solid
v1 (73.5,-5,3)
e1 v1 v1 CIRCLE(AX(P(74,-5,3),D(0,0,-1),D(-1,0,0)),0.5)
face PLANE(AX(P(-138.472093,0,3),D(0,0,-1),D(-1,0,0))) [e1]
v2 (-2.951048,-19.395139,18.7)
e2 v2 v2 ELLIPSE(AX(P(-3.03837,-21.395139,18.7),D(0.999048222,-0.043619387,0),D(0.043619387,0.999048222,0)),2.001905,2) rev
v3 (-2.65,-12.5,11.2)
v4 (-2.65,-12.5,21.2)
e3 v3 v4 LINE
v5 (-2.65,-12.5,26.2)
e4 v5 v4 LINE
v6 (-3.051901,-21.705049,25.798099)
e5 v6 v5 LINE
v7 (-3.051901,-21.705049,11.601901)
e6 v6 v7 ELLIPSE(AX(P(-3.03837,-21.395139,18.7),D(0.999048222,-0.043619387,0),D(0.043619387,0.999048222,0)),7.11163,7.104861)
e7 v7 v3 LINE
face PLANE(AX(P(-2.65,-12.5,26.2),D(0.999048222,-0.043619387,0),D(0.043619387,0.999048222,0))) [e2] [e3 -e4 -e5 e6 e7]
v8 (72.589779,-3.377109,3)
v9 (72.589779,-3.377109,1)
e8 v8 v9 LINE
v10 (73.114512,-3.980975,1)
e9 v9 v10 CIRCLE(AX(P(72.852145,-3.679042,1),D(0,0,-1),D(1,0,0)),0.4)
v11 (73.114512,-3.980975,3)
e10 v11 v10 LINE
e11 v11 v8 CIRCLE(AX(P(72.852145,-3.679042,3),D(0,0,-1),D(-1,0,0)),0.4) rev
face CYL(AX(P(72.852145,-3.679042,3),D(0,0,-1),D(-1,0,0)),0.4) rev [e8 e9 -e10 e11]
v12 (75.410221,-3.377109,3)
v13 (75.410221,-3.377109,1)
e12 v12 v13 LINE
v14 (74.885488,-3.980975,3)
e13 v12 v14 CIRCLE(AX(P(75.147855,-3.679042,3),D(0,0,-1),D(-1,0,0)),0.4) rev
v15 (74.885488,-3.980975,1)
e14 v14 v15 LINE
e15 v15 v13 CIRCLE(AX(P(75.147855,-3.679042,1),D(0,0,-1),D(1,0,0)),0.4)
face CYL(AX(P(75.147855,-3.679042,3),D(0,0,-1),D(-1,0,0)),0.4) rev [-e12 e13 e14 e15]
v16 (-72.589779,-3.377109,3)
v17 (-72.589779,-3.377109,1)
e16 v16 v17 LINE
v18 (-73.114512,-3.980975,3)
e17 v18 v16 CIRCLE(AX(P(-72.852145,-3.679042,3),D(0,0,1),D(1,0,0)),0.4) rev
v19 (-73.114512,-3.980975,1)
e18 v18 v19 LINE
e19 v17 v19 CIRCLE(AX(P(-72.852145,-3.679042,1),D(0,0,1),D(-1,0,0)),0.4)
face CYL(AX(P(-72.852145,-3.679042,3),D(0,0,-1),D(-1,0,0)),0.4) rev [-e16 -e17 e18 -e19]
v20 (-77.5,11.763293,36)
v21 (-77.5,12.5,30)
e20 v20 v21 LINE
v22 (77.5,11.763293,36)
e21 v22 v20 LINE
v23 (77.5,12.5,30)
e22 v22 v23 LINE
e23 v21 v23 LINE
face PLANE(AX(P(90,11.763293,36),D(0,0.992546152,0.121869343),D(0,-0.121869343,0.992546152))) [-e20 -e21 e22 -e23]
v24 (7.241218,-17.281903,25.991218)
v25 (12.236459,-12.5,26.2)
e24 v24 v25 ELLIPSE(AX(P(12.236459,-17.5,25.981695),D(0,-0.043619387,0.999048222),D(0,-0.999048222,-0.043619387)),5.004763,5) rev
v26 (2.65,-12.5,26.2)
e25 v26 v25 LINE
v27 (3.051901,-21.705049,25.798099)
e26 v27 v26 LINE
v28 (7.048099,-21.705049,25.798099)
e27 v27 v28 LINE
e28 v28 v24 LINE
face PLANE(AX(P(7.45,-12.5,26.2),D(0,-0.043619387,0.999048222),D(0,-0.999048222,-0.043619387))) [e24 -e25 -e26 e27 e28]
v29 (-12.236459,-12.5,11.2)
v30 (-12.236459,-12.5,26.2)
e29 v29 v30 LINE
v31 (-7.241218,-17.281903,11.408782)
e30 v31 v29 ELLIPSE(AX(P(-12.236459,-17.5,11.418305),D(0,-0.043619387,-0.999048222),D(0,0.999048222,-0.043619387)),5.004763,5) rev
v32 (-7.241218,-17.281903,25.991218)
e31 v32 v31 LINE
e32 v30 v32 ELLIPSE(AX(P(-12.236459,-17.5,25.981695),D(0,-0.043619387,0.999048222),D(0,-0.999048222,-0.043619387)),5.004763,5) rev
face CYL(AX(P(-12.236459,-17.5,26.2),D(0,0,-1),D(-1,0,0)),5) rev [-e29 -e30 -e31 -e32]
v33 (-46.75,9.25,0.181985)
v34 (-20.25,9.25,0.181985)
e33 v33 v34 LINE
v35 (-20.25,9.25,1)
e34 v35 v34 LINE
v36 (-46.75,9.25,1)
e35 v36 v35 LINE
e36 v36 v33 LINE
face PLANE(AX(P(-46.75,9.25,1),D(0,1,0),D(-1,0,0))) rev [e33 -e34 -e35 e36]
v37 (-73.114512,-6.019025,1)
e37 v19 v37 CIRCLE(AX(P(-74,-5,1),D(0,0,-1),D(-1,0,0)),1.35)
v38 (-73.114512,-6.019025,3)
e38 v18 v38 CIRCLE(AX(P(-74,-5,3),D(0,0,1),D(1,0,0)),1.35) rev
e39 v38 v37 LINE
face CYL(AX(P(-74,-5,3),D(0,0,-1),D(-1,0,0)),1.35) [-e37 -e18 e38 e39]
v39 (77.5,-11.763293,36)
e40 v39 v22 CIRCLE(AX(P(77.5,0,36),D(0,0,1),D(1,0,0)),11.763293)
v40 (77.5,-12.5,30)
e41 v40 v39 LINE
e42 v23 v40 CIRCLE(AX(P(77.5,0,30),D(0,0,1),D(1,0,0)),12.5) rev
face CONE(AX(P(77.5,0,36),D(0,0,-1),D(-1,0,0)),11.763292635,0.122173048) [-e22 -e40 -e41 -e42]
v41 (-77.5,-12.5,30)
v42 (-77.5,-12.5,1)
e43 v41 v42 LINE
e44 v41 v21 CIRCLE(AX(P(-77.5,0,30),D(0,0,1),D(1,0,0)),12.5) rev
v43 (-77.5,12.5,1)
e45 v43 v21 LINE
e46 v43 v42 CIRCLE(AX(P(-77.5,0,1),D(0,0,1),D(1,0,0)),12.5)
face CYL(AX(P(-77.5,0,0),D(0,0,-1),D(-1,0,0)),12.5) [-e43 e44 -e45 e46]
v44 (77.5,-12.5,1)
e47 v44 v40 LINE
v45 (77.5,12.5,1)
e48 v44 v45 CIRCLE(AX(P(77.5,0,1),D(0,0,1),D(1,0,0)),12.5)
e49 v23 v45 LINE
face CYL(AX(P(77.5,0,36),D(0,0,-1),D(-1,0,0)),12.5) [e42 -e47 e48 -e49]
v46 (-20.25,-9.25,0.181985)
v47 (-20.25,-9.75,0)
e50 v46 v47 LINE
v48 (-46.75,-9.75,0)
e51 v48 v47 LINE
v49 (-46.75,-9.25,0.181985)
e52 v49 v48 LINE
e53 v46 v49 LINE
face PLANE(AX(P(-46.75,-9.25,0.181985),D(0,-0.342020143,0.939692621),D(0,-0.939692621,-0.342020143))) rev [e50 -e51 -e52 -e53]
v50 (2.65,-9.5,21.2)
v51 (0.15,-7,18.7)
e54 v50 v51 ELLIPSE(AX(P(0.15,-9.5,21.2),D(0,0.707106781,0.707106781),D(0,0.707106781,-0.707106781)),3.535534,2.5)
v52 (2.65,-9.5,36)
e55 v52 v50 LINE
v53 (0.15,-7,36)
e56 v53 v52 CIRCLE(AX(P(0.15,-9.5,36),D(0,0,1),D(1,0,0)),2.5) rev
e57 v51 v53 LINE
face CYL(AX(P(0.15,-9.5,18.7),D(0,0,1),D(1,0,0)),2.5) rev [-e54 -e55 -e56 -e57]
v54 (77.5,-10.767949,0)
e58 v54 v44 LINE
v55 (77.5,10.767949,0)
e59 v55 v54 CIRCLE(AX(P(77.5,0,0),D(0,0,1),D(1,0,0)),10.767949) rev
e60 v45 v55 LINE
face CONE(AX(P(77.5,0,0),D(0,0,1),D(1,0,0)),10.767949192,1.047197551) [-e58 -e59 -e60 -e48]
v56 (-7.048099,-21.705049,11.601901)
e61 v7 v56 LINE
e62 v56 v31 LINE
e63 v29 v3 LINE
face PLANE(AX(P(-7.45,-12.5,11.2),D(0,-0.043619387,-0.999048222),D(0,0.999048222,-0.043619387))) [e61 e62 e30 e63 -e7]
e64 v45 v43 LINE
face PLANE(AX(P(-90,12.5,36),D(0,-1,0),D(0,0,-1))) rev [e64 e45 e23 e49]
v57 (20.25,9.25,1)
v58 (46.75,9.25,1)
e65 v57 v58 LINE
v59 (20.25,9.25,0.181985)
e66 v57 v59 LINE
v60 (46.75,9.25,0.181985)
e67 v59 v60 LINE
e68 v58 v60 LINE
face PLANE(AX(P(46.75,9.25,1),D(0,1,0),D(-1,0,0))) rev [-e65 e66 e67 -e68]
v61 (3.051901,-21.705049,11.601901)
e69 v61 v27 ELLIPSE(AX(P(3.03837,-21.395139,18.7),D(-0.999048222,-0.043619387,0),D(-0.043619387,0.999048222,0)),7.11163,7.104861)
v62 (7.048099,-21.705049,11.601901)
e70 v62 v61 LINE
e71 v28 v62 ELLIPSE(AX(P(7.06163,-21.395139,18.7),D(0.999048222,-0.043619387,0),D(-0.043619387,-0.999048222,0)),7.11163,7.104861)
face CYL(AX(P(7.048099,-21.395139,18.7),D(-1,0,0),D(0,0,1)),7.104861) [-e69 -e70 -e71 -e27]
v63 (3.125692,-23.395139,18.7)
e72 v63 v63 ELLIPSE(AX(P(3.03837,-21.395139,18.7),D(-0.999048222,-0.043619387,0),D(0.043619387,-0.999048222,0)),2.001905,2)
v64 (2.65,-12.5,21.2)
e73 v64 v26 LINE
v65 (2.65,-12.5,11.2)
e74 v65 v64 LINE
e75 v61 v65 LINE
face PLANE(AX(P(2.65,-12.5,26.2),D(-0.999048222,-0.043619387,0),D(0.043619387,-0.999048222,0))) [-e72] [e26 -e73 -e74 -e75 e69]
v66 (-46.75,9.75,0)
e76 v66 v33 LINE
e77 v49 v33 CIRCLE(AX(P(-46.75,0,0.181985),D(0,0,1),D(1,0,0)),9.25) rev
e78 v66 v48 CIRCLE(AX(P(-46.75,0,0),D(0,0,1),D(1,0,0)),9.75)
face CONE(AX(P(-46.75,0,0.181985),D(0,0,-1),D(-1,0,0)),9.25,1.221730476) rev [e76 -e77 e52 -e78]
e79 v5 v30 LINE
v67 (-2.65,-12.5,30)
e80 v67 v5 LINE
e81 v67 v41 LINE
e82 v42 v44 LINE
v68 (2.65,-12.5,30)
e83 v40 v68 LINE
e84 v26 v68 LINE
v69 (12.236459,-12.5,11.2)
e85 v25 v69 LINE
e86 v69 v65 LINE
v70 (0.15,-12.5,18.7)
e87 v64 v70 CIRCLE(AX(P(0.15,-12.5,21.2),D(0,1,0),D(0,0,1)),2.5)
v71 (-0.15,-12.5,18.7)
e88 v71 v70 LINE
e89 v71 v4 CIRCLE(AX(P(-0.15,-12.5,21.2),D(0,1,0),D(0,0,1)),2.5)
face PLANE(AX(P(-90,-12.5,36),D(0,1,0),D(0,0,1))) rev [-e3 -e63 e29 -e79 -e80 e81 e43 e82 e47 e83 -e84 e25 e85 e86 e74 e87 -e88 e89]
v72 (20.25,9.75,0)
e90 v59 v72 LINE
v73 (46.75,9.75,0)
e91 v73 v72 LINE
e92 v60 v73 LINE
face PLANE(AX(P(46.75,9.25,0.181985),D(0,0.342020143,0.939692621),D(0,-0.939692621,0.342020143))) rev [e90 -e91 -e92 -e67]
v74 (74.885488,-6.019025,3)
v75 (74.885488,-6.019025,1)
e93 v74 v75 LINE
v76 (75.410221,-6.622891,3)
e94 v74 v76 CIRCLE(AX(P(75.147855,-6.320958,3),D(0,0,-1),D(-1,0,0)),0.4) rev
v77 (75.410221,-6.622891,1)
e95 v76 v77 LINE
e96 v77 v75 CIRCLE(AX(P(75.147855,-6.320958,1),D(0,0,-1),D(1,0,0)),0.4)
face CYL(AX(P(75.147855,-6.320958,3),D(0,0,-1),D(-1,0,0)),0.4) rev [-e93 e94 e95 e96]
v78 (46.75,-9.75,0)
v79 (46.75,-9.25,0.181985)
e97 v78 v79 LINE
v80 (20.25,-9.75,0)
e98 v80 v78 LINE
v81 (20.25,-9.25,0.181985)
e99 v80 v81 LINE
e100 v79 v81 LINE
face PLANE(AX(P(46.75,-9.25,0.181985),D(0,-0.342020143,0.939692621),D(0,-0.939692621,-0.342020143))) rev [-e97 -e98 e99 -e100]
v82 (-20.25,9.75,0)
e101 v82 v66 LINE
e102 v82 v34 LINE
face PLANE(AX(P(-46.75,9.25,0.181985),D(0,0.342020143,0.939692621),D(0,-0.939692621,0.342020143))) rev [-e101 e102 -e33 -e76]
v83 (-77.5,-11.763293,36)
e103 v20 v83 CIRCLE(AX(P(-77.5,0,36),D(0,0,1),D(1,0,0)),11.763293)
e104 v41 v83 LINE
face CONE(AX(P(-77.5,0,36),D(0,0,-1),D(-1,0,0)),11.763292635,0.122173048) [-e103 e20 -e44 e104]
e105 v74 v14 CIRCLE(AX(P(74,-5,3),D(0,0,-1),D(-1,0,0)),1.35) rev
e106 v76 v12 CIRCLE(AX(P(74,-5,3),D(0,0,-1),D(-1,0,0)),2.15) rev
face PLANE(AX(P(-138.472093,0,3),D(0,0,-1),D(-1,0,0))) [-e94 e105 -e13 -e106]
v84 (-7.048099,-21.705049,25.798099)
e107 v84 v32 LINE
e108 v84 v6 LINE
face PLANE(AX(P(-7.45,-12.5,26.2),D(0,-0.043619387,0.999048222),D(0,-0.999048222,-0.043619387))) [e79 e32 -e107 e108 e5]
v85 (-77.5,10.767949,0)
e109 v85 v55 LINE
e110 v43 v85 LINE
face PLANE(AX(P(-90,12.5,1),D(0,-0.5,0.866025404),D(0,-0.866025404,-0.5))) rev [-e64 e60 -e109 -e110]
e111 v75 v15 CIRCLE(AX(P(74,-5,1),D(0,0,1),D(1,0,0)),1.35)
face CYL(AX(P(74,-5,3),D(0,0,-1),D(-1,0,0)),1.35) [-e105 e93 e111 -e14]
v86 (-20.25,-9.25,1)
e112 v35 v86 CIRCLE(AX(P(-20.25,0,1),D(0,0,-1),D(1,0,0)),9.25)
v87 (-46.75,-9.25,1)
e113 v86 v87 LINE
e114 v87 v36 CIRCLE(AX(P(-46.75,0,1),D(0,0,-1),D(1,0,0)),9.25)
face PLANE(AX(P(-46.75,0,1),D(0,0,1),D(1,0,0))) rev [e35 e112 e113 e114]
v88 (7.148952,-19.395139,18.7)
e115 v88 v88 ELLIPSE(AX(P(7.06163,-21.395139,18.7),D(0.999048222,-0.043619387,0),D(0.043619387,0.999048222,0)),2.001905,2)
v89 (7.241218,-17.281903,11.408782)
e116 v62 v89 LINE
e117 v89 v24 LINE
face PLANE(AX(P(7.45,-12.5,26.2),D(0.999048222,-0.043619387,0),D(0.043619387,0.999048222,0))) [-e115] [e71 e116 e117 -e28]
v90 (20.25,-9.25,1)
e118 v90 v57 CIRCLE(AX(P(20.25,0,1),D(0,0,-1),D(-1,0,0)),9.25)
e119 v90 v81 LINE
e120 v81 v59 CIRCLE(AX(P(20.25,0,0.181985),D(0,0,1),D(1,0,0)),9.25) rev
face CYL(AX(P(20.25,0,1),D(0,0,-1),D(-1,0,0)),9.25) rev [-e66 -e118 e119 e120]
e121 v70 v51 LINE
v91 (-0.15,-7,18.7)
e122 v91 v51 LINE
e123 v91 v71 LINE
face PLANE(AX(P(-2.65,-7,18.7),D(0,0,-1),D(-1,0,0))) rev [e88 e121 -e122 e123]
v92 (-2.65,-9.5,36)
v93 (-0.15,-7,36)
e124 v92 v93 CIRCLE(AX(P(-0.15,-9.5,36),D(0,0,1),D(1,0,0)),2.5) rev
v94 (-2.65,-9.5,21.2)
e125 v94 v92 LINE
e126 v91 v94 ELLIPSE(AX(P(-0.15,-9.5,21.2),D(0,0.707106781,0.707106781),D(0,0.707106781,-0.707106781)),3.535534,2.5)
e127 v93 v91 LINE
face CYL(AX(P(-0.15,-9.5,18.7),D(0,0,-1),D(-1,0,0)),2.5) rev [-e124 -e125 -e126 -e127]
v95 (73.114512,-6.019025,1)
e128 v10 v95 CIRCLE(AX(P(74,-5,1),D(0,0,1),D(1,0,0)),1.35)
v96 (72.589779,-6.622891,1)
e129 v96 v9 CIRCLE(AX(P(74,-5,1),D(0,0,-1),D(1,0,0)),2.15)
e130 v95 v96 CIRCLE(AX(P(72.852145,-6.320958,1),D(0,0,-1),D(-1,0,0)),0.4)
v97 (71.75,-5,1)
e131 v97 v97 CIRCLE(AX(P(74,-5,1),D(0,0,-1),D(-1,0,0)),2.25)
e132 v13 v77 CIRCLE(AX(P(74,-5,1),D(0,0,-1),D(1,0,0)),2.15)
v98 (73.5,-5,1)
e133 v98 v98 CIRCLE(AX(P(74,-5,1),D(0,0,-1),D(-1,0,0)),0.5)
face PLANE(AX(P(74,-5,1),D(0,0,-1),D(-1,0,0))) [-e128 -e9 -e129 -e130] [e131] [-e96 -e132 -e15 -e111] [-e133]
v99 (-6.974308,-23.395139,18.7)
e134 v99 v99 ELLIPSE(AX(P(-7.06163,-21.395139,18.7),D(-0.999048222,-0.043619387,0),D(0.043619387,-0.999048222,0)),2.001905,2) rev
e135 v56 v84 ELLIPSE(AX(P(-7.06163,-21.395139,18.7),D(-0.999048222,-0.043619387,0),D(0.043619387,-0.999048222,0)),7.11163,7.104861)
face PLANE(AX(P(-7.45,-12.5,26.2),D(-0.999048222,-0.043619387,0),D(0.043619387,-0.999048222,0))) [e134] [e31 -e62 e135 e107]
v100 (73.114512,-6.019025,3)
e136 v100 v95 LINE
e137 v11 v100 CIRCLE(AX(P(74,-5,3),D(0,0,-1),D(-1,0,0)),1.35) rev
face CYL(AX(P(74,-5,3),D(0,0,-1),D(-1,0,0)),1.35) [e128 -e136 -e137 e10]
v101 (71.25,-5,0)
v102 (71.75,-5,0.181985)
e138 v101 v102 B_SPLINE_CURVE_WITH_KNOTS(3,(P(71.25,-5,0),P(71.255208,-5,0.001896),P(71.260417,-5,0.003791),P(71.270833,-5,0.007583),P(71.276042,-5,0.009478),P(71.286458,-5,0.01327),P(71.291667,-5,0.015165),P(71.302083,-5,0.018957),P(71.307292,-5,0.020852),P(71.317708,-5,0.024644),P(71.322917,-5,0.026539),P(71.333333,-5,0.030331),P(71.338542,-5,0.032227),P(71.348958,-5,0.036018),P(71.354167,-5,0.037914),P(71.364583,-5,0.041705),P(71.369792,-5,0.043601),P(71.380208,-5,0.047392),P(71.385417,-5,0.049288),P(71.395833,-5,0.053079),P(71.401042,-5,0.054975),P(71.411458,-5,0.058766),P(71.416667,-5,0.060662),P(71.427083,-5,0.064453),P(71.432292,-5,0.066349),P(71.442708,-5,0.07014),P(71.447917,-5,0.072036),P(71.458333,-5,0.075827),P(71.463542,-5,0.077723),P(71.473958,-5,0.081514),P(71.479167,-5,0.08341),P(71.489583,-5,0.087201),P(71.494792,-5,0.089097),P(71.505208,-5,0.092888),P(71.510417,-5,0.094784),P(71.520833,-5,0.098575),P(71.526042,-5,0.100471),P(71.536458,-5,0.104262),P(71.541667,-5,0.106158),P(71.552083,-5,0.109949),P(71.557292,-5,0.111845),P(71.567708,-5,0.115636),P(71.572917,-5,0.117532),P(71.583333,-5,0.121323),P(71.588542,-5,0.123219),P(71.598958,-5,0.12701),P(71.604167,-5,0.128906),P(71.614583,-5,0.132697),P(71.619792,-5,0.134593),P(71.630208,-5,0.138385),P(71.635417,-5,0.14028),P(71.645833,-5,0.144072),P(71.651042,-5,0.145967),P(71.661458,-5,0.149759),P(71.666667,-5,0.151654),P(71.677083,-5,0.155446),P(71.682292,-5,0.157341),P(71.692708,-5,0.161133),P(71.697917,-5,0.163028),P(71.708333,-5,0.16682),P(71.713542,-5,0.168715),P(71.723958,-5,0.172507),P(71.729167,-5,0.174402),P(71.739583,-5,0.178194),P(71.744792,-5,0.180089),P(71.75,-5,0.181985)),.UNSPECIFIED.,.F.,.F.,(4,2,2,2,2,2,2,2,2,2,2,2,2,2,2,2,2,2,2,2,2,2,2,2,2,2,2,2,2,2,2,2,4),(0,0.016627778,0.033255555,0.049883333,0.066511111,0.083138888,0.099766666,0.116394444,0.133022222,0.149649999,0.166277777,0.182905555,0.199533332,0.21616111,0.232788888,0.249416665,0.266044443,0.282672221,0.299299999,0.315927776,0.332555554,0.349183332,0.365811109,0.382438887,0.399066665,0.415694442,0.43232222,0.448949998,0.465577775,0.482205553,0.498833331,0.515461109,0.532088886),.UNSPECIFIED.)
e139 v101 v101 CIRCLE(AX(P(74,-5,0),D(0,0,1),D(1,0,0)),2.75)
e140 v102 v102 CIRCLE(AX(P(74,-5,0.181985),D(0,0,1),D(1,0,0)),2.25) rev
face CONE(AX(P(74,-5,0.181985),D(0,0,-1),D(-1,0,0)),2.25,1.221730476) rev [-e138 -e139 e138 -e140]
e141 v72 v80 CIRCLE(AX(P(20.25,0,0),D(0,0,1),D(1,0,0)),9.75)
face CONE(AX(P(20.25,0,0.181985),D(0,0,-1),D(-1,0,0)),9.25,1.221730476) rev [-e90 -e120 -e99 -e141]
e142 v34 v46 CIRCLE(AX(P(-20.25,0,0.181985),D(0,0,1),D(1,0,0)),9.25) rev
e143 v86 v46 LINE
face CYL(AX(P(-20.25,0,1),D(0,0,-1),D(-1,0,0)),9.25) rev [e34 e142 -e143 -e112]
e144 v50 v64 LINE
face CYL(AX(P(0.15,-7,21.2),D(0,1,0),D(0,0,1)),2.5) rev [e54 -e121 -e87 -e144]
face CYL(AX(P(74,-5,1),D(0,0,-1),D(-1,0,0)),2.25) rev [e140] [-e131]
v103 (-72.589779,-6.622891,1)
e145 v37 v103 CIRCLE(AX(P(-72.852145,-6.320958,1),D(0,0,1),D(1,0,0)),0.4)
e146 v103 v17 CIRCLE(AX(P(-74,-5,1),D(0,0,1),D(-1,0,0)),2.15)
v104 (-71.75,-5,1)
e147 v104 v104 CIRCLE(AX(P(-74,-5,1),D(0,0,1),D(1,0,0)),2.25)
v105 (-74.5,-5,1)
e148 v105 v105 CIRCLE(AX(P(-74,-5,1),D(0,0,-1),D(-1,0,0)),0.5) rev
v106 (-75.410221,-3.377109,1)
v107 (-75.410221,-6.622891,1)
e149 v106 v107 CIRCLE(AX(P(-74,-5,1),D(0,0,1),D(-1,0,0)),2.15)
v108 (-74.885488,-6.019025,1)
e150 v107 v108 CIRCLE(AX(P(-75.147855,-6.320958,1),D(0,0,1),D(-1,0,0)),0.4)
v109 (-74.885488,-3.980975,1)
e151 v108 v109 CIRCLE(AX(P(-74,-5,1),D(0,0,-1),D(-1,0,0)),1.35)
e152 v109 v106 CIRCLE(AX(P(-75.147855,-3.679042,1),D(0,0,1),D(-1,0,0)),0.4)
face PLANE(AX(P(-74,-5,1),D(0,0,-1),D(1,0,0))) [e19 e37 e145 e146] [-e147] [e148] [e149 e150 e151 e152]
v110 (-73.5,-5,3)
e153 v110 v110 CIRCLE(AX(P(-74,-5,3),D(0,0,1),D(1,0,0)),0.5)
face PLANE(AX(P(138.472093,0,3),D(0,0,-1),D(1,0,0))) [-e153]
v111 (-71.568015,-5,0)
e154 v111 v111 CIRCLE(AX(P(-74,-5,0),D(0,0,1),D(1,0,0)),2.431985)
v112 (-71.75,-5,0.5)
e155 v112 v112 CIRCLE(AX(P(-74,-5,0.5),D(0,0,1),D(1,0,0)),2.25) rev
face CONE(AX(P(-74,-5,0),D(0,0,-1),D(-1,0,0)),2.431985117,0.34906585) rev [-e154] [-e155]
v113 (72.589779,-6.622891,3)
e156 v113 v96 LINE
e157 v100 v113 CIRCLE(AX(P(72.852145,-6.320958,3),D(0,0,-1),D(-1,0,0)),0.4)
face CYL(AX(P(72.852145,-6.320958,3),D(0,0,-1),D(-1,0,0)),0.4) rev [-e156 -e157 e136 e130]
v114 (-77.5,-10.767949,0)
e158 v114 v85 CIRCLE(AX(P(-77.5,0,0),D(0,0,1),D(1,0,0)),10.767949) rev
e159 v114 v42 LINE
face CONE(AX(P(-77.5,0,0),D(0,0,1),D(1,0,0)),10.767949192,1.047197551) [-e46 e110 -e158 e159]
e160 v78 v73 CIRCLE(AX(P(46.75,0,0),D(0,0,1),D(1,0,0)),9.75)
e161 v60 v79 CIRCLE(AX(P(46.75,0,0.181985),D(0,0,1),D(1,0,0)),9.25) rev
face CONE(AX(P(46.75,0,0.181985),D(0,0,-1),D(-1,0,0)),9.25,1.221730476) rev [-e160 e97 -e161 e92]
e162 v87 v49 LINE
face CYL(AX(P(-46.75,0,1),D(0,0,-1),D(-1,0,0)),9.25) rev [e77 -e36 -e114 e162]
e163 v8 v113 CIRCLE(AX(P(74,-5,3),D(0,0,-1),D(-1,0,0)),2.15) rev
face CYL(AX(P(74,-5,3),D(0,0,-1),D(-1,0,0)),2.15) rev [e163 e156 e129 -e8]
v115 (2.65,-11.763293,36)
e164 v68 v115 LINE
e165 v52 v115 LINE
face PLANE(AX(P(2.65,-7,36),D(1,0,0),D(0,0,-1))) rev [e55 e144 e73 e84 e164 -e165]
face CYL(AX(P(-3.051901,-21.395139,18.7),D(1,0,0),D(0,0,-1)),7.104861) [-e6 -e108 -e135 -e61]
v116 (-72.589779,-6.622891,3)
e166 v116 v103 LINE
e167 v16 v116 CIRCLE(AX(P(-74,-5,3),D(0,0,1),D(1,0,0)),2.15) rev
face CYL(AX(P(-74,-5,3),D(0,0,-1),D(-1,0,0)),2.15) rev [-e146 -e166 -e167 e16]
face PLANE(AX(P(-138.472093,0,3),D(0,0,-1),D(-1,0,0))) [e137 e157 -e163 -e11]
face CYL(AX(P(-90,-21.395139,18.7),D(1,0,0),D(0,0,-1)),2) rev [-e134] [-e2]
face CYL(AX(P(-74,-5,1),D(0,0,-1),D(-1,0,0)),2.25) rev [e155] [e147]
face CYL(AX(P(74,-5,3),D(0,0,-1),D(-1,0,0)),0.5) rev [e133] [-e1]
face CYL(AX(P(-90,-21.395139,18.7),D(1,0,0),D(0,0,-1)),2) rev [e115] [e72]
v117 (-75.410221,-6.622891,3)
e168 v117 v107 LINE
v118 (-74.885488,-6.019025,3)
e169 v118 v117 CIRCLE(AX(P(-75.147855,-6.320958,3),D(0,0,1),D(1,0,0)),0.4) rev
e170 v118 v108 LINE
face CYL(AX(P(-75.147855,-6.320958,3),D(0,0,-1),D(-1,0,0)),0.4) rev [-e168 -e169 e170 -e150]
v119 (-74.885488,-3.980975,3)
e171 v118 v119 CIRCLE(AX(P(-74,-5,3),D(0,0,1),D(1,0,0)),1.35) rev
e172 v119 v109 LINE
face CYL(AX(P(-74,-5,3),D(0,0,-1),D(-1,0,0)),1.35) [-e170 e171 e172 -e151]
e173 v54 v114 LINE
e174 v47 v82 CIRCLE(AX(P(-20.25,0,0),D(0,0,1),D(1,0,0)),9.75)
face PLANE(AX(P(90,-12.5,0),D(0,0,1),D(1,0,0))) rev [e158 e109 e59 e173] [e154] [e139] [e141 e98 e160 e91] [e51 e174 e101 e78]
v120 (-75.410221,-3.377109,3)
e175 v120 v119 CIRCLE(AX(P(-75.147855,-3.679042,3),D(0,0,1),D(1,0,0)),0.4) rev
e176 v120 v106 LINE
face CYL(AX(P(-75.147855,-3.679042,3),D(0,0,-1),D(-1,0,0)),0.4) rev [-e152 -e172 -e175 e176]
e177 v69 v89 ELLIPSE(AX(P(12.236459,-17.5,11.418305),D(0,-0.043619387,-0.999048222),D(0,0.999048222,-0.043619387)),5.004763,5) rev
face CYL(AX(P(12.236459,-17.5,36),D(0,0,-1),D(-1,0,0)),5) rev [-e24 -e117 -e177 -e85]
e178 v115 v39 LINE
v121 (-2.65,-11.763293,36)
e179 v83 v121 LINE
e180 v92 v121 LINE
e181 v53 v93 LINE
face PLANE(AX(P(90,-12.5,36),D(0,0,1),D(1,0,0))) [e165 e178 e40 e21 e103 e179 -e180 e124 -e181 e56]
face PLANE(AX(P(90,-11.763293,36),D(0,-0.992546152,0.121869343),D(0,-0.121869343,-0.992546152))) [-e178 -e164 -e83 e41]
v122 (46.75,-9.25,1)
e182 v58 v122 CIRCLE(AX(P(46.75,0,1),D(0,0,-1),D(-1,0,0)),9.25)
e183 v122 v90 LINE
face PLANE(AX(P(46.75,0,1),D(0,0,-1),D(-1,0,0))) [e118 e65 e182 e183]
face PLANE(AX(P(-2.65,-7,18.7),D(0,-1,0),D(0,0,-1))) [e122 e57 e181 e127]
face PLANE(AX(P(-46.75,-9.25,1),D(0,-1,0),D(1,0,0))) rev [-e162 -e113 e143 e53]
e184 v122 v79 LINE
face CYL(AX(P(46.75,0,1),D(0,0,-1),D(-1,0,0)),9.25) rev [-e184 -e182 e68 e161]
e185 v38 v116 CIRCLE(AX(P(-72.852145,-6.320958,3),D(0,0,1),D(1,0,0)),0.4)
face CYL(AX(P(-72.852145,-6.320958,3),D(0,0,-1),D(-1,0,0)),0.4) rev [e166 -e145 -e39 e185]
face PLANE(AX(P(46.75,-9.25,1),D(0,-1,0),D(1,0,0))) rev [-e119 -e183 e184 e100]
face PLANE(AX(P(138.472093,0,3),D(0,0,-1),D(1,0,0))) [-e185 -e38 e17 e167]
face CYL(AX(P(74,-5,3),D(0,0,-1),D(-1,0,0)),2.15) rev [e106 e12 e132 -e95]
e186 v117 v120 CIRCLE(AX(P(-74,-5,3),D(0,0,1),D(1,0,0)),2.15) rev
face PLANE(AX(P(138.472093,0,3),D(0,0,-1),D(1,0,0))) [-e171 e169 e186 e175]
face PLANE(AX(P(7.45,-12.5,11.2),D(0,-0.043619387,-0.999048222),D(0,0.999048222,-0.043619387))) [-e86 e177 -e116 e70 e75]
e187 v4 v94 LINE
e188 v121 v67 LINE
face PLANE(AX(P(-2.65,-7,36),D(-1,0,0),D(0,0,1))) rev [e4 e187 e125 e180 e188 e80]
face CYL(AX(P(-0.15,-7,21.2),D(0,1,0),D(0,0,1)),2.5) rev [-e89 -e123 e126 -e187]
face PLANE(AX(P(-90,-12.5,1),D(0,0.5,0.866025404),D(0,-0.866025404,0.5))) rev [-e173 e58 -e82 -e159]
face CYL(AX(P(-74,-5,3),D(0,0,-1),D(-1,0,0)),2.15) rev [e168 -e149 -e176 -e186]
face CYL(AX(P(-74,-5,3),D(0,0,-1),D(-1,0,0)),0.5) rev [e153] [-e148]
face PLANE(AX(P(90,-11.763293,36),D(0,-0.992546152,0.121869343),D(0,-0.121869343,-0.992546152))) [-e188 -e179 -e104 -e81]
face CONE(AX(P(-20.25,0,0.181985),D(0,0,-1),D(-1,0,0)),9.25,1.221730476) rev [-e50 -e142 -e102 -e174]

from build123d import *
from OCP.BRepFilletAPI import BRepFilletAPI_MakeChamfer

# Parameters (mm, degrees)
SKETCH1_W                 = 180
SKETCH1_H                 = 25
BOSS_EXTRUDE1_DEPTH       = 36
FILLET1_RADIUS            = 12.5
FILLET1_LENGTH            = 36
FILLET2_RADIUS            = 12.5
FILLET2_LENGTH            = 36
CHAMFER1_SIZE             = 6
CHAMFER1_SIZE2            = 0.736707365
CHAMFER2_SIZE             = 1
CHAMFER2_SIZE2            = 1.732050808
CUT_EXTRUDE1_DEPTH        = 1
CHAMFER3_SIZE             = 0.5
CHAMFER3_SIZE2            = 0.181985117
SKETCH4_R                 = 2.25
SKETCH4_R_2               = 0.5
CUT_EXTRUDE2_DEPTH        = 1
SKETCH4_2_R               = 0.5
CUT_EXTRUDE3_DEPTH        = 3
CHAMFER4_SIZE             = 0.5
CHAMFER4_SIZE2            = 0.181985117
CHAMFER4_OF_MIRROR1_SIZE2 = 0.5
CHAMFER4_OF_MIRROR1_SIZE  = 0.181985117
SKETCH6_W                 = 4.8
SKETCH6_H                 = 15
BOSS_EXTRUDE2_DEPTH       = 16
BOSS_EXTRUDE2_TAPER       = 2.5
FILLET3_R                 = 5
FILLET4_R                 = 7.104861
FILLET3_OF_MIRROR2_R      = 5
FILLET4_OF_MIRROR2_R      = 7.104861
CUT_EXTRUDE4_DEPTH        = 102.035884743
CUT_EXTRUDE4_DEPTH_BACK   = 102.035884743
SKETCH7_R                 = 2
SKETCH8_W                 = 5.3
SKETCH8_H                 = 17.3
CUT_EXTRUDE5_DEPTH        = 5.5
FILLET5_R                 = 2.5


# Some blends are built 0.0001 mm under size
with BuildPart() as part:
    # Sketch1 → Boss-Extrude1 (new body)
    with BuildSketch(Plane.XY):
        Rectangle(SKETCH1_W, SKETCH1_H)
    extrude(amount=BOSS_EXTRUDE1_DEPTH)

    # Fillet1: full round fillet: the end face becomes a half cylinder, R = half its width
    fillet1_face = Plane((90, 0, 18), x_dir=(0, 0, -1), z_dir=(1, 0, 0))  # on the end face: x along it, z out of the body
    fillet1_slab = fillet1_face.offset(-FILLET1_RADIUS / 2) * Box(FILLET1_LENGTH, 2 * FILLET1_RADIUS, FILLET1_RADIUS, mode=Mode.PRIVATE)  # the body's end, R deep
    fillet1_round = Plane((77.5, 0, 18), x_dir=(1, 0, 0), z_dir=(0, 0, -1)) * Cylinder(FILLET1_RADIUS, FILLET1_LENGTH, mode=Mode.PRIVATE)  # its axis R under the face
    add(fillet1_slab - fillet1_round, mode=Mode.SUBTRACT)

    # Fillet2: full round fillet: the end face becomes a half cylinder, R = half its width
    fillet2_face = Plane((-90, 0, 18), x_dir=(0, 0, 1), z_dir=(-1, 0, 0))  # on the end face: x along it, z out of the body
    fillet2_slab = fillet2_face.offset(-FILLET2_RADIUS / 2) * Box(FILLET2_LENGTH, 2 * FILLET2_RADIUS, FILLET2_RADIUS, mode=Mode.PRIVATE)  # the body's end, R deep
    fillet2_round = Plane((-77.5, 0, 18), x_dir=(-1, 0, 0), z_dir=(0, 0, 1)) * Cylinder(FILLET2_RADIUS, FILLET2_LENGTH, mode=Mode.PRIVATE)  # its axis R under the face
    add(fillet2_slab - fillet2_round, mode=Mode.SUBTRACT)

    # Chamfer1: one chamfer whose edges measure the first distance from different faces: ONE call of the kernel's chamfer builder (chamfer() names one face for all edges)
    chamfer1_edges_1 = [part.edges().sort_by_distance(p)[0] for p in [
        (0, 12.5, 36),
    ]]
    chamfer1_side_1 = [part.faces().sort_by_distance(p)[0] for p in [
        (0, 12.5, 18),
    ]]
    chamfer1_edges_2 = [part.edges().sort_by_distance(p)[0] for p in [
        (90, 0, 36),
    ]]
    chamfer1_side_2 = [part.faces().sort_by_distance(p)[0] for p in [
        (90, 0, 18),
    ]]
    chamfer1_edges_3 = [part.edges().sort_by_distance(p)[0] for p in [
        (0, -12.5, 36),
    ]]
    chamfer1_side_3 = [part.faces().sort_by_distance(p)[0] for p in [
        (0, -12.5, 18),
    ]]
    chamfer1_edges_4 = [part.edges().sort_by_distance(p)[0] for p in [
        (-90, 0, 36),
    ]]
    chamfer1_side_4 = [part.faces().sort_by_distance(p)[0] for p in [
        (-90, 0, 18),
    ]]
    chamfer1 = BRepFilletAPI_MakeChamfer(part.part.solid().wrapped)
    for e in chamfer1_edges_1:
        chamfer1.Add(CHAMFER1_SIZE, CHAMFER1_SIZE2, e.wrapped, chamfer1_side_1[0].wrapped)  # the first distance lies on this face
    for e in chamfer1_edges_2:
        chamfer1.Add(CHAMFER1_SIZE, CHAMFER1_SIZE2, e.wrapped, chamfer1_side_2[0].wrapped)  # the first distance lies on this face
    for e in chamfer1_edges_3:
        chamfer1.Add(CHAMFER1_SIZE, CHAMFER1_SIZE2, e.wrapped, chamfer1_side_3[0].wrapped)  # the first distance lies on this face
    for e in chamfer1_edges_4:
        chamfer1.Add(CHAMFER1_SIZE, CHAMFER1_SIZE2, e.wrapped, chamfer1_side_4[0].wrapped)  # the first distance lies on this face
    add(Compound.cast(chamfer1.Shape()), mode=Mode.REPLACE)

    # Chamfer2: one chamfer whose edges measure the first distance from different faces: ONE call of the kernel's chamfer builder (chamfer() names one face for all edges)
    chamfer2_edges_1 = [part.edges().sort_by_distance(p)[0] for p in [
        (0, 12.5, 0),
    ]]
    chamfer2_side_1 = [part.faces().sort_by_distance(p)[0] for p in [
        (0, 12.5, 15),
    ]]
    chamfer2_edges_2 = [part.edges().sort_by_distance(p)[0] for p in [
        (90, 0, 0),
    ]]
    chamfer2_side_2 = [part.faces().sort_by_distance(p)[0] for p in [
        (90, 0, 15),
    ]]
    chamfer2_edges_3 = [part.edges().sort_by_distance(p)[0] for p in [
        (0, -12.5, 0),
    ]]
    chamfer2_side_3 = [part.faces().sort_by_distance(p)[0] for p in [
        (0, -12.5, 15),
    ]]
    chamfer2_edges_4 = [part.edges().sort_by_distance(p)[0] for p in [
        (-90, 0, 0),
    ]]
    chamfer2_side_4 = [part.faces().sort_by_distance(p)[0] for p in [
        (-90, 0, 15),
    ]]
    chamfer2 = BRepFilletAPI_MakeChamfer(part.part.solid().wrapped)
    for e in chamfer2_edges_1:
        chamfer2.Add(CHAMFER2_SIZE, CHAMFER2_SIZE2, e.wrapped, chamfer2_side_1[0].wrapped)  # the first distance lies on this face
    for e in chamfer2_edges_2:
        chamfer2.Add(CHAMFER2_SIZE, CHAMFER2_SIZE2, e.wrapped, chamfer2_side_2[0].wrapped)  # the first distance lies on this face
    for e in chamfer2_edges_3:
        chamfer2.Add(CHAMFER2_SIZE, CHAMFER2_SIZE2, e.wrapped, chamfer2_side_3[0].wrapped)  # the first distance lies on this face
    for e in chamfer2_edges_4:
        chamfer2.Add(CHAMFER2_SIZE, CHAMFER2_SIZE2, e.wrapped, chamfer2_side_4[0].wrapped)  # the first distance lies on this face
    add(Compound.cast(chamfer2.Shape()), mode=Mode.REPLACE)

    # Sketch2 → Cut-Extrude1 (cut)
    with BuildSketch(Plane(origin=(0, 0, 0), x_dir=(-1, 0, 0), z_dir=(0, 0, -1))):
        with BuildLine():
            Line((-46.75, 9.25), (-20.25, 9.25))
            ThreePointArc((-20.25, 9.25), (-11, 0), (-20.25, -9.25))
            Line((-20.25, -9.25), (-46.75, -9.25))
            ThreePointArc((-46.75, -9.25), (-56, 0), (-46.75, 9.25))
        make_face()
        with BuildLine():
            Line((46.75, 9.25), (20.25, 9.25))
            ThreePointArc((20.25, 9.25), (11, 0), (20.25, -9.25))
            Line((20.25, -9.25), (46.75, -9.25))
            ThreePointArc((46.75, -9.25), (56, 0), (46.75, 9.25))
        make_face()
    extrude(amount=-CUT_EXTRUDE1_DEPTH, mode=Mode.SUBTRACT)

    # Chamfer3
    chamfer3_edges = [part.edges().sort_by_distance(p)[0] for p in [
        (56, 0, 0),
        (33.5, -9.25, 0),
        (11, 0, 0),
        (33.5, 9.25, 0),
        (-56, 0, 0),
        (-33.5, 9.25, 0),
        (-11, 0, 0),
        (-33.5, -9.25, 0),
    ]]
    chamfer3_side = [part.faces().sort_by_distance(p)[0] for p in [
        (0, 0, 0),
    ]]
    chamfer(chamfer3_edges, length=CHAMFER3_SIZE, length2=CHAMFER3_SIZE2, reference=chamfer3_side[0])

    # Sketch4 → Cut-Extrude2 (cut)
    with BuildSketch(Plane(origin=(0, 0, 0), x_dir=(-1, 0, 0), z_dir=(0, 0, -1))):
        with Locations((-74, -5)):
            Circle(SKETCH4_R)
        with Locations((-74, -5)):
            Circle(SKETCH4_R_2, mode=Mode.SUBTRACT)
        with BuildLine():
            ThreePointArc((-72.589778643, -3.377108838), (-71.85, -5), (-72.589778643, -6.622891162))
            ThreePointArc((-72.589778643, -6.622891162), (-73.154078646, -6.583324687), (-73.114512171, -6.019024683))
            ThreePointArc((-73.114512171, -6.019024683), (-72.65, -5), (-73.114512171, -3.980975317))
            ThreePointArc((-73.114512171, -3.980975317), (-73.154078646, -3.416675313), (-72.589778643, -3.377108838))
        make_face(mode=Mode.SUBTRACT)
        with BuildLine():
            ThreePointArc((-75.410221357, -6.622891162), (-76.15, -5), (-75.410221357, -3.377108838))
            ThreePointArc((-75.410221357, -3.377108838), (-74.845921354, -3.416675313), (-74.885487829, -3.980975317))
            ThreePointArc((-74.885487829, -3.980975317), (-75.35, -5), (-74.885487829, -6.019024683))
            ThreePointArc((-74.885487829, -6.019024683), (-74.845921354, -6.583324687), (-75.410221357, -6.622891162))
        make_face(mode=Mode.SUBTRACT)
    cut_extrude2 = extrude(amount=-CUT_EXTRUDE2_DEPTH, mode=Mode.SUBTRACT)

    # Sketch4<2> → Cut-Extrude3 (cut)
    with BuildSketch(Plane(origin=(0, 0, 0), x_dir=(-1, 0, 0), z_dir=(0, 0, -1))):
        with BuildLine():
            ThreePointArc((-74.885487829, -6.019024683), (-74.845921354, -6.583324687), (-75.410221357, -6.622891162))
            ThreePointArc((-75.410221357, -6.622891162), (-76.15, -5), (-75.410221357, -3.377108838))
            ThreePointArc((-75.410221357, -3.377108838), (-74.845921354, -3.416675313), (-74.885487829, -3.980975317))
            ThreePointArc((-74.885487829, -3.980975317), (-75.35, -5), (-74.885487829, -6.019024683))
        make_face()
        with BuildLine():
            ThreePointArc((-73.114512171, -3.980975317), (-73.154078646, -3.416675313), (-72.589778643, -3.377108838))
            ThreePointArc((-72.589778643, -3.377108838), (-71.85, -5), (-72.589778643, -6.622891162))
            ThreePointArc((-72.589778643, -6.622891162), (-73.154078646, -6.583324687), (-73.114512171, -6.019024683))
            ThreePointArc((-73.114512171, -6.019024683), (-72.65, -5), (-73.114512171, -3.980975317))
        make_face()
        with Locations((-74, -5)):
            Circle(SKETCH4_2_R)
    cut_extrude3 = extrude(amount=-CUT_EXTRUDE3_DEPTH, mode=Mode.SUBTRACT)

    # Chamfer4
    chamfer4_edges = [part.edges().sort_by_distance(p)[0] for p in [
        (76.25, -5, 0),
    ]]
    chamfer4_side = [part.faces().sort_by_distance(p)[0] for p in [
        (-0.572534996, 0.038684797, 0),
    ]]
    chamfer(chamfer4_edges, length=CHAMFER4_SIZE, length2=CHAMFER4_SIZE2, reference=chamfer4_side[0])

    # Mirror1: Cut-Extrude2, Cut-Extrude3 across plane
    add(cut_extrude2.mirror(Plane(origin=(0, 0, 0), x_dir=(0, 0, 1), z_dir=(1, 0, 0))), mode=Mode.SUBTRACT)
    add(cut_extrude3.mirror(Plane(origin=(0, 0, 0), x_dir=(0, 0, 1), z_dir=(1, 0, 0))), mode=Mode.SUBTRACT)

    # Chamfer4 of Mirror1
    chamfer4_of_mirror1_edges = [part.edges().sort_by_distance(p)[0] for p in [
        (-76.25, -5, 0),
    ]]
    chamfer(chamfer4_of_mirror1_edges, length=CHAMFER4_OF_MIRROR1_SIZE, length2=CHAMFER4_OF_MIRROR1_SIZE2)

    # Sketch6 → Boss-Extrude2 (add)
    with BuildSketch(Plane.XZ.offset(12.5)):
        with Locations((-5.05, 18.7)):
            Rectangle(SKETCH6_W, SKETCH6_H)
    boss_extrude2 = extrude(amount=BOSS_EXTRUDE2_DEPTH, taper=BOSS_EXTRUDE2_TAPER)

    # Fillet3
    fillet3_edges = [part.edges().sort_by_distance(p)[0] for p in [
        (-7.45, -12.5, 18.7),
    ]]
    fillet(fillet3_edges, radius=FILLET3_R)

    # Fillet4
    fillet4_edges = [part.edges().sort_by_distance(p)[0] for p in [
        (-5.05, -28.5, 11.898575087),
        (-5.05, -28.5, 25.501424913),
    ]]
    fillet(fillet4_edges, radius=FILLET4_R - 0.0001)  # a hair under: the kernel refuses the full size

    # Mirror2: Boss-Extrude2 across plane
    add(boss_extrude2.mirror(Plane(origin=(0, 0, 0), x_dir=(0, 0, 1), z_dir=(1, 0, 0))))

    # Fillet3 of Mirror2
    fillet3_of_mirror2_edges = [part.edges().sort_by_distance(p)[0] for p in [
        (7.45, -12.5, 18.7),
    ]]
    fillet(fillet3_of_mirror2_edges, radius=FILLET3_OF_MIRROR2_R)

    # Fillet4 of Mirror2
    fillet4_of_mirror2_edges = [part.edges().sort_by_distance(p)[0] for p in [
        (5.05, -28.5, 11.898575087),
        (5.05, -28.5, 25.501424913),
    ]]
    fillet(fillet4_of_mirror2_edges, radius=FILLET4_OF_MIRROR2_R - 0.0001)  # a hair under: the kernel refuses the full size

    # Sketch7 → Cut-Extrude4 (cut, two sides: drawn at the far end of the back side and taken through both)
    with BuildSketch(Plane(origin=(0, 0, 0), x_dir=(0, 0, -1), z_dir=(1, 0, 0)).offset(-CUT_EXTRUDE4_DEPTH_BACK)):
        with Locations(Location((-18.7, -21.395138845, 0), (0, 0, 90))):
            Circle(SKETCH7_R)
    extrude(amount=CUT_EXTRUDE4_DEPTH + CUT_EXTRUDE4_DEPTH_BACK, mode=Mode.SUBTRACT)

    # Sketch8 → Cut-Extrude5 (cut)
    with BuildSketch(Plane.XZ.offset(12.5)):
        with Locations((0, 27.35)):
            Rectangle(SKETCH8_W, SKETCH8_H)
    extrude(amount=-CUT_EXTRUDE5_DEPTH, mode=Mode.SUBTRACT)

    # Fillet5
    # the kernel refuses this fillet: 2.5 mm, written as the material it adds along each edge
    with BuildSketch(Plane(origin=(-2.65, -7, 12.45), x_dir=(0, -1, 0), z_dir=(0, 0, 1)), Plane(origin=(2.65, -7, 36), x_dir=(0, -1, 0), z_dir=(0, 0, -1))) as fillet5_piece_1:
        with BuildLine():
            CenterArc((FILLET5_R, FILLET5_R), FILLET5_R, 180, 90)
            Line((0, FILLET5_R), (0, 0))
            Line((0, 0), (FILLET5_R, 0))
        make_face()
    extrude(amount=23.55)
    with BuildSketch(Plane(origin=(-2.65, -12.5, 18.7), x_dir=(0, 0, 1), z_dir=(0, 1, 0))) as fillet5_piece_2:
        with BuildLine():
            CenterArc((FILLET5_R, FILLET5_R), FILLET5_R, 180, 90)
            Line((0, FILLET5_R), (0, 0))
            Line((0, 0), (FILLET5_R, 0))
        make_face()
    extrude(amount=11.75)
    with BuildSketch(Plane(origin=(2.65, -12.5, 18.7), x_dir=(0, 0, 1), z_dir=(0, 1, 0))) as fillet5_piece_3:
        with BuildLine():
            CenterArc((FILLET5_R, -FILLET5_R), FILLET5_R, 90, 90)
            Line((0, -FILLET5_R), (0, 0))
            Line((0, 0), (FILLET5_R, 0))
        make_face()
    extrude(amount=11.75)


solid = part.part
